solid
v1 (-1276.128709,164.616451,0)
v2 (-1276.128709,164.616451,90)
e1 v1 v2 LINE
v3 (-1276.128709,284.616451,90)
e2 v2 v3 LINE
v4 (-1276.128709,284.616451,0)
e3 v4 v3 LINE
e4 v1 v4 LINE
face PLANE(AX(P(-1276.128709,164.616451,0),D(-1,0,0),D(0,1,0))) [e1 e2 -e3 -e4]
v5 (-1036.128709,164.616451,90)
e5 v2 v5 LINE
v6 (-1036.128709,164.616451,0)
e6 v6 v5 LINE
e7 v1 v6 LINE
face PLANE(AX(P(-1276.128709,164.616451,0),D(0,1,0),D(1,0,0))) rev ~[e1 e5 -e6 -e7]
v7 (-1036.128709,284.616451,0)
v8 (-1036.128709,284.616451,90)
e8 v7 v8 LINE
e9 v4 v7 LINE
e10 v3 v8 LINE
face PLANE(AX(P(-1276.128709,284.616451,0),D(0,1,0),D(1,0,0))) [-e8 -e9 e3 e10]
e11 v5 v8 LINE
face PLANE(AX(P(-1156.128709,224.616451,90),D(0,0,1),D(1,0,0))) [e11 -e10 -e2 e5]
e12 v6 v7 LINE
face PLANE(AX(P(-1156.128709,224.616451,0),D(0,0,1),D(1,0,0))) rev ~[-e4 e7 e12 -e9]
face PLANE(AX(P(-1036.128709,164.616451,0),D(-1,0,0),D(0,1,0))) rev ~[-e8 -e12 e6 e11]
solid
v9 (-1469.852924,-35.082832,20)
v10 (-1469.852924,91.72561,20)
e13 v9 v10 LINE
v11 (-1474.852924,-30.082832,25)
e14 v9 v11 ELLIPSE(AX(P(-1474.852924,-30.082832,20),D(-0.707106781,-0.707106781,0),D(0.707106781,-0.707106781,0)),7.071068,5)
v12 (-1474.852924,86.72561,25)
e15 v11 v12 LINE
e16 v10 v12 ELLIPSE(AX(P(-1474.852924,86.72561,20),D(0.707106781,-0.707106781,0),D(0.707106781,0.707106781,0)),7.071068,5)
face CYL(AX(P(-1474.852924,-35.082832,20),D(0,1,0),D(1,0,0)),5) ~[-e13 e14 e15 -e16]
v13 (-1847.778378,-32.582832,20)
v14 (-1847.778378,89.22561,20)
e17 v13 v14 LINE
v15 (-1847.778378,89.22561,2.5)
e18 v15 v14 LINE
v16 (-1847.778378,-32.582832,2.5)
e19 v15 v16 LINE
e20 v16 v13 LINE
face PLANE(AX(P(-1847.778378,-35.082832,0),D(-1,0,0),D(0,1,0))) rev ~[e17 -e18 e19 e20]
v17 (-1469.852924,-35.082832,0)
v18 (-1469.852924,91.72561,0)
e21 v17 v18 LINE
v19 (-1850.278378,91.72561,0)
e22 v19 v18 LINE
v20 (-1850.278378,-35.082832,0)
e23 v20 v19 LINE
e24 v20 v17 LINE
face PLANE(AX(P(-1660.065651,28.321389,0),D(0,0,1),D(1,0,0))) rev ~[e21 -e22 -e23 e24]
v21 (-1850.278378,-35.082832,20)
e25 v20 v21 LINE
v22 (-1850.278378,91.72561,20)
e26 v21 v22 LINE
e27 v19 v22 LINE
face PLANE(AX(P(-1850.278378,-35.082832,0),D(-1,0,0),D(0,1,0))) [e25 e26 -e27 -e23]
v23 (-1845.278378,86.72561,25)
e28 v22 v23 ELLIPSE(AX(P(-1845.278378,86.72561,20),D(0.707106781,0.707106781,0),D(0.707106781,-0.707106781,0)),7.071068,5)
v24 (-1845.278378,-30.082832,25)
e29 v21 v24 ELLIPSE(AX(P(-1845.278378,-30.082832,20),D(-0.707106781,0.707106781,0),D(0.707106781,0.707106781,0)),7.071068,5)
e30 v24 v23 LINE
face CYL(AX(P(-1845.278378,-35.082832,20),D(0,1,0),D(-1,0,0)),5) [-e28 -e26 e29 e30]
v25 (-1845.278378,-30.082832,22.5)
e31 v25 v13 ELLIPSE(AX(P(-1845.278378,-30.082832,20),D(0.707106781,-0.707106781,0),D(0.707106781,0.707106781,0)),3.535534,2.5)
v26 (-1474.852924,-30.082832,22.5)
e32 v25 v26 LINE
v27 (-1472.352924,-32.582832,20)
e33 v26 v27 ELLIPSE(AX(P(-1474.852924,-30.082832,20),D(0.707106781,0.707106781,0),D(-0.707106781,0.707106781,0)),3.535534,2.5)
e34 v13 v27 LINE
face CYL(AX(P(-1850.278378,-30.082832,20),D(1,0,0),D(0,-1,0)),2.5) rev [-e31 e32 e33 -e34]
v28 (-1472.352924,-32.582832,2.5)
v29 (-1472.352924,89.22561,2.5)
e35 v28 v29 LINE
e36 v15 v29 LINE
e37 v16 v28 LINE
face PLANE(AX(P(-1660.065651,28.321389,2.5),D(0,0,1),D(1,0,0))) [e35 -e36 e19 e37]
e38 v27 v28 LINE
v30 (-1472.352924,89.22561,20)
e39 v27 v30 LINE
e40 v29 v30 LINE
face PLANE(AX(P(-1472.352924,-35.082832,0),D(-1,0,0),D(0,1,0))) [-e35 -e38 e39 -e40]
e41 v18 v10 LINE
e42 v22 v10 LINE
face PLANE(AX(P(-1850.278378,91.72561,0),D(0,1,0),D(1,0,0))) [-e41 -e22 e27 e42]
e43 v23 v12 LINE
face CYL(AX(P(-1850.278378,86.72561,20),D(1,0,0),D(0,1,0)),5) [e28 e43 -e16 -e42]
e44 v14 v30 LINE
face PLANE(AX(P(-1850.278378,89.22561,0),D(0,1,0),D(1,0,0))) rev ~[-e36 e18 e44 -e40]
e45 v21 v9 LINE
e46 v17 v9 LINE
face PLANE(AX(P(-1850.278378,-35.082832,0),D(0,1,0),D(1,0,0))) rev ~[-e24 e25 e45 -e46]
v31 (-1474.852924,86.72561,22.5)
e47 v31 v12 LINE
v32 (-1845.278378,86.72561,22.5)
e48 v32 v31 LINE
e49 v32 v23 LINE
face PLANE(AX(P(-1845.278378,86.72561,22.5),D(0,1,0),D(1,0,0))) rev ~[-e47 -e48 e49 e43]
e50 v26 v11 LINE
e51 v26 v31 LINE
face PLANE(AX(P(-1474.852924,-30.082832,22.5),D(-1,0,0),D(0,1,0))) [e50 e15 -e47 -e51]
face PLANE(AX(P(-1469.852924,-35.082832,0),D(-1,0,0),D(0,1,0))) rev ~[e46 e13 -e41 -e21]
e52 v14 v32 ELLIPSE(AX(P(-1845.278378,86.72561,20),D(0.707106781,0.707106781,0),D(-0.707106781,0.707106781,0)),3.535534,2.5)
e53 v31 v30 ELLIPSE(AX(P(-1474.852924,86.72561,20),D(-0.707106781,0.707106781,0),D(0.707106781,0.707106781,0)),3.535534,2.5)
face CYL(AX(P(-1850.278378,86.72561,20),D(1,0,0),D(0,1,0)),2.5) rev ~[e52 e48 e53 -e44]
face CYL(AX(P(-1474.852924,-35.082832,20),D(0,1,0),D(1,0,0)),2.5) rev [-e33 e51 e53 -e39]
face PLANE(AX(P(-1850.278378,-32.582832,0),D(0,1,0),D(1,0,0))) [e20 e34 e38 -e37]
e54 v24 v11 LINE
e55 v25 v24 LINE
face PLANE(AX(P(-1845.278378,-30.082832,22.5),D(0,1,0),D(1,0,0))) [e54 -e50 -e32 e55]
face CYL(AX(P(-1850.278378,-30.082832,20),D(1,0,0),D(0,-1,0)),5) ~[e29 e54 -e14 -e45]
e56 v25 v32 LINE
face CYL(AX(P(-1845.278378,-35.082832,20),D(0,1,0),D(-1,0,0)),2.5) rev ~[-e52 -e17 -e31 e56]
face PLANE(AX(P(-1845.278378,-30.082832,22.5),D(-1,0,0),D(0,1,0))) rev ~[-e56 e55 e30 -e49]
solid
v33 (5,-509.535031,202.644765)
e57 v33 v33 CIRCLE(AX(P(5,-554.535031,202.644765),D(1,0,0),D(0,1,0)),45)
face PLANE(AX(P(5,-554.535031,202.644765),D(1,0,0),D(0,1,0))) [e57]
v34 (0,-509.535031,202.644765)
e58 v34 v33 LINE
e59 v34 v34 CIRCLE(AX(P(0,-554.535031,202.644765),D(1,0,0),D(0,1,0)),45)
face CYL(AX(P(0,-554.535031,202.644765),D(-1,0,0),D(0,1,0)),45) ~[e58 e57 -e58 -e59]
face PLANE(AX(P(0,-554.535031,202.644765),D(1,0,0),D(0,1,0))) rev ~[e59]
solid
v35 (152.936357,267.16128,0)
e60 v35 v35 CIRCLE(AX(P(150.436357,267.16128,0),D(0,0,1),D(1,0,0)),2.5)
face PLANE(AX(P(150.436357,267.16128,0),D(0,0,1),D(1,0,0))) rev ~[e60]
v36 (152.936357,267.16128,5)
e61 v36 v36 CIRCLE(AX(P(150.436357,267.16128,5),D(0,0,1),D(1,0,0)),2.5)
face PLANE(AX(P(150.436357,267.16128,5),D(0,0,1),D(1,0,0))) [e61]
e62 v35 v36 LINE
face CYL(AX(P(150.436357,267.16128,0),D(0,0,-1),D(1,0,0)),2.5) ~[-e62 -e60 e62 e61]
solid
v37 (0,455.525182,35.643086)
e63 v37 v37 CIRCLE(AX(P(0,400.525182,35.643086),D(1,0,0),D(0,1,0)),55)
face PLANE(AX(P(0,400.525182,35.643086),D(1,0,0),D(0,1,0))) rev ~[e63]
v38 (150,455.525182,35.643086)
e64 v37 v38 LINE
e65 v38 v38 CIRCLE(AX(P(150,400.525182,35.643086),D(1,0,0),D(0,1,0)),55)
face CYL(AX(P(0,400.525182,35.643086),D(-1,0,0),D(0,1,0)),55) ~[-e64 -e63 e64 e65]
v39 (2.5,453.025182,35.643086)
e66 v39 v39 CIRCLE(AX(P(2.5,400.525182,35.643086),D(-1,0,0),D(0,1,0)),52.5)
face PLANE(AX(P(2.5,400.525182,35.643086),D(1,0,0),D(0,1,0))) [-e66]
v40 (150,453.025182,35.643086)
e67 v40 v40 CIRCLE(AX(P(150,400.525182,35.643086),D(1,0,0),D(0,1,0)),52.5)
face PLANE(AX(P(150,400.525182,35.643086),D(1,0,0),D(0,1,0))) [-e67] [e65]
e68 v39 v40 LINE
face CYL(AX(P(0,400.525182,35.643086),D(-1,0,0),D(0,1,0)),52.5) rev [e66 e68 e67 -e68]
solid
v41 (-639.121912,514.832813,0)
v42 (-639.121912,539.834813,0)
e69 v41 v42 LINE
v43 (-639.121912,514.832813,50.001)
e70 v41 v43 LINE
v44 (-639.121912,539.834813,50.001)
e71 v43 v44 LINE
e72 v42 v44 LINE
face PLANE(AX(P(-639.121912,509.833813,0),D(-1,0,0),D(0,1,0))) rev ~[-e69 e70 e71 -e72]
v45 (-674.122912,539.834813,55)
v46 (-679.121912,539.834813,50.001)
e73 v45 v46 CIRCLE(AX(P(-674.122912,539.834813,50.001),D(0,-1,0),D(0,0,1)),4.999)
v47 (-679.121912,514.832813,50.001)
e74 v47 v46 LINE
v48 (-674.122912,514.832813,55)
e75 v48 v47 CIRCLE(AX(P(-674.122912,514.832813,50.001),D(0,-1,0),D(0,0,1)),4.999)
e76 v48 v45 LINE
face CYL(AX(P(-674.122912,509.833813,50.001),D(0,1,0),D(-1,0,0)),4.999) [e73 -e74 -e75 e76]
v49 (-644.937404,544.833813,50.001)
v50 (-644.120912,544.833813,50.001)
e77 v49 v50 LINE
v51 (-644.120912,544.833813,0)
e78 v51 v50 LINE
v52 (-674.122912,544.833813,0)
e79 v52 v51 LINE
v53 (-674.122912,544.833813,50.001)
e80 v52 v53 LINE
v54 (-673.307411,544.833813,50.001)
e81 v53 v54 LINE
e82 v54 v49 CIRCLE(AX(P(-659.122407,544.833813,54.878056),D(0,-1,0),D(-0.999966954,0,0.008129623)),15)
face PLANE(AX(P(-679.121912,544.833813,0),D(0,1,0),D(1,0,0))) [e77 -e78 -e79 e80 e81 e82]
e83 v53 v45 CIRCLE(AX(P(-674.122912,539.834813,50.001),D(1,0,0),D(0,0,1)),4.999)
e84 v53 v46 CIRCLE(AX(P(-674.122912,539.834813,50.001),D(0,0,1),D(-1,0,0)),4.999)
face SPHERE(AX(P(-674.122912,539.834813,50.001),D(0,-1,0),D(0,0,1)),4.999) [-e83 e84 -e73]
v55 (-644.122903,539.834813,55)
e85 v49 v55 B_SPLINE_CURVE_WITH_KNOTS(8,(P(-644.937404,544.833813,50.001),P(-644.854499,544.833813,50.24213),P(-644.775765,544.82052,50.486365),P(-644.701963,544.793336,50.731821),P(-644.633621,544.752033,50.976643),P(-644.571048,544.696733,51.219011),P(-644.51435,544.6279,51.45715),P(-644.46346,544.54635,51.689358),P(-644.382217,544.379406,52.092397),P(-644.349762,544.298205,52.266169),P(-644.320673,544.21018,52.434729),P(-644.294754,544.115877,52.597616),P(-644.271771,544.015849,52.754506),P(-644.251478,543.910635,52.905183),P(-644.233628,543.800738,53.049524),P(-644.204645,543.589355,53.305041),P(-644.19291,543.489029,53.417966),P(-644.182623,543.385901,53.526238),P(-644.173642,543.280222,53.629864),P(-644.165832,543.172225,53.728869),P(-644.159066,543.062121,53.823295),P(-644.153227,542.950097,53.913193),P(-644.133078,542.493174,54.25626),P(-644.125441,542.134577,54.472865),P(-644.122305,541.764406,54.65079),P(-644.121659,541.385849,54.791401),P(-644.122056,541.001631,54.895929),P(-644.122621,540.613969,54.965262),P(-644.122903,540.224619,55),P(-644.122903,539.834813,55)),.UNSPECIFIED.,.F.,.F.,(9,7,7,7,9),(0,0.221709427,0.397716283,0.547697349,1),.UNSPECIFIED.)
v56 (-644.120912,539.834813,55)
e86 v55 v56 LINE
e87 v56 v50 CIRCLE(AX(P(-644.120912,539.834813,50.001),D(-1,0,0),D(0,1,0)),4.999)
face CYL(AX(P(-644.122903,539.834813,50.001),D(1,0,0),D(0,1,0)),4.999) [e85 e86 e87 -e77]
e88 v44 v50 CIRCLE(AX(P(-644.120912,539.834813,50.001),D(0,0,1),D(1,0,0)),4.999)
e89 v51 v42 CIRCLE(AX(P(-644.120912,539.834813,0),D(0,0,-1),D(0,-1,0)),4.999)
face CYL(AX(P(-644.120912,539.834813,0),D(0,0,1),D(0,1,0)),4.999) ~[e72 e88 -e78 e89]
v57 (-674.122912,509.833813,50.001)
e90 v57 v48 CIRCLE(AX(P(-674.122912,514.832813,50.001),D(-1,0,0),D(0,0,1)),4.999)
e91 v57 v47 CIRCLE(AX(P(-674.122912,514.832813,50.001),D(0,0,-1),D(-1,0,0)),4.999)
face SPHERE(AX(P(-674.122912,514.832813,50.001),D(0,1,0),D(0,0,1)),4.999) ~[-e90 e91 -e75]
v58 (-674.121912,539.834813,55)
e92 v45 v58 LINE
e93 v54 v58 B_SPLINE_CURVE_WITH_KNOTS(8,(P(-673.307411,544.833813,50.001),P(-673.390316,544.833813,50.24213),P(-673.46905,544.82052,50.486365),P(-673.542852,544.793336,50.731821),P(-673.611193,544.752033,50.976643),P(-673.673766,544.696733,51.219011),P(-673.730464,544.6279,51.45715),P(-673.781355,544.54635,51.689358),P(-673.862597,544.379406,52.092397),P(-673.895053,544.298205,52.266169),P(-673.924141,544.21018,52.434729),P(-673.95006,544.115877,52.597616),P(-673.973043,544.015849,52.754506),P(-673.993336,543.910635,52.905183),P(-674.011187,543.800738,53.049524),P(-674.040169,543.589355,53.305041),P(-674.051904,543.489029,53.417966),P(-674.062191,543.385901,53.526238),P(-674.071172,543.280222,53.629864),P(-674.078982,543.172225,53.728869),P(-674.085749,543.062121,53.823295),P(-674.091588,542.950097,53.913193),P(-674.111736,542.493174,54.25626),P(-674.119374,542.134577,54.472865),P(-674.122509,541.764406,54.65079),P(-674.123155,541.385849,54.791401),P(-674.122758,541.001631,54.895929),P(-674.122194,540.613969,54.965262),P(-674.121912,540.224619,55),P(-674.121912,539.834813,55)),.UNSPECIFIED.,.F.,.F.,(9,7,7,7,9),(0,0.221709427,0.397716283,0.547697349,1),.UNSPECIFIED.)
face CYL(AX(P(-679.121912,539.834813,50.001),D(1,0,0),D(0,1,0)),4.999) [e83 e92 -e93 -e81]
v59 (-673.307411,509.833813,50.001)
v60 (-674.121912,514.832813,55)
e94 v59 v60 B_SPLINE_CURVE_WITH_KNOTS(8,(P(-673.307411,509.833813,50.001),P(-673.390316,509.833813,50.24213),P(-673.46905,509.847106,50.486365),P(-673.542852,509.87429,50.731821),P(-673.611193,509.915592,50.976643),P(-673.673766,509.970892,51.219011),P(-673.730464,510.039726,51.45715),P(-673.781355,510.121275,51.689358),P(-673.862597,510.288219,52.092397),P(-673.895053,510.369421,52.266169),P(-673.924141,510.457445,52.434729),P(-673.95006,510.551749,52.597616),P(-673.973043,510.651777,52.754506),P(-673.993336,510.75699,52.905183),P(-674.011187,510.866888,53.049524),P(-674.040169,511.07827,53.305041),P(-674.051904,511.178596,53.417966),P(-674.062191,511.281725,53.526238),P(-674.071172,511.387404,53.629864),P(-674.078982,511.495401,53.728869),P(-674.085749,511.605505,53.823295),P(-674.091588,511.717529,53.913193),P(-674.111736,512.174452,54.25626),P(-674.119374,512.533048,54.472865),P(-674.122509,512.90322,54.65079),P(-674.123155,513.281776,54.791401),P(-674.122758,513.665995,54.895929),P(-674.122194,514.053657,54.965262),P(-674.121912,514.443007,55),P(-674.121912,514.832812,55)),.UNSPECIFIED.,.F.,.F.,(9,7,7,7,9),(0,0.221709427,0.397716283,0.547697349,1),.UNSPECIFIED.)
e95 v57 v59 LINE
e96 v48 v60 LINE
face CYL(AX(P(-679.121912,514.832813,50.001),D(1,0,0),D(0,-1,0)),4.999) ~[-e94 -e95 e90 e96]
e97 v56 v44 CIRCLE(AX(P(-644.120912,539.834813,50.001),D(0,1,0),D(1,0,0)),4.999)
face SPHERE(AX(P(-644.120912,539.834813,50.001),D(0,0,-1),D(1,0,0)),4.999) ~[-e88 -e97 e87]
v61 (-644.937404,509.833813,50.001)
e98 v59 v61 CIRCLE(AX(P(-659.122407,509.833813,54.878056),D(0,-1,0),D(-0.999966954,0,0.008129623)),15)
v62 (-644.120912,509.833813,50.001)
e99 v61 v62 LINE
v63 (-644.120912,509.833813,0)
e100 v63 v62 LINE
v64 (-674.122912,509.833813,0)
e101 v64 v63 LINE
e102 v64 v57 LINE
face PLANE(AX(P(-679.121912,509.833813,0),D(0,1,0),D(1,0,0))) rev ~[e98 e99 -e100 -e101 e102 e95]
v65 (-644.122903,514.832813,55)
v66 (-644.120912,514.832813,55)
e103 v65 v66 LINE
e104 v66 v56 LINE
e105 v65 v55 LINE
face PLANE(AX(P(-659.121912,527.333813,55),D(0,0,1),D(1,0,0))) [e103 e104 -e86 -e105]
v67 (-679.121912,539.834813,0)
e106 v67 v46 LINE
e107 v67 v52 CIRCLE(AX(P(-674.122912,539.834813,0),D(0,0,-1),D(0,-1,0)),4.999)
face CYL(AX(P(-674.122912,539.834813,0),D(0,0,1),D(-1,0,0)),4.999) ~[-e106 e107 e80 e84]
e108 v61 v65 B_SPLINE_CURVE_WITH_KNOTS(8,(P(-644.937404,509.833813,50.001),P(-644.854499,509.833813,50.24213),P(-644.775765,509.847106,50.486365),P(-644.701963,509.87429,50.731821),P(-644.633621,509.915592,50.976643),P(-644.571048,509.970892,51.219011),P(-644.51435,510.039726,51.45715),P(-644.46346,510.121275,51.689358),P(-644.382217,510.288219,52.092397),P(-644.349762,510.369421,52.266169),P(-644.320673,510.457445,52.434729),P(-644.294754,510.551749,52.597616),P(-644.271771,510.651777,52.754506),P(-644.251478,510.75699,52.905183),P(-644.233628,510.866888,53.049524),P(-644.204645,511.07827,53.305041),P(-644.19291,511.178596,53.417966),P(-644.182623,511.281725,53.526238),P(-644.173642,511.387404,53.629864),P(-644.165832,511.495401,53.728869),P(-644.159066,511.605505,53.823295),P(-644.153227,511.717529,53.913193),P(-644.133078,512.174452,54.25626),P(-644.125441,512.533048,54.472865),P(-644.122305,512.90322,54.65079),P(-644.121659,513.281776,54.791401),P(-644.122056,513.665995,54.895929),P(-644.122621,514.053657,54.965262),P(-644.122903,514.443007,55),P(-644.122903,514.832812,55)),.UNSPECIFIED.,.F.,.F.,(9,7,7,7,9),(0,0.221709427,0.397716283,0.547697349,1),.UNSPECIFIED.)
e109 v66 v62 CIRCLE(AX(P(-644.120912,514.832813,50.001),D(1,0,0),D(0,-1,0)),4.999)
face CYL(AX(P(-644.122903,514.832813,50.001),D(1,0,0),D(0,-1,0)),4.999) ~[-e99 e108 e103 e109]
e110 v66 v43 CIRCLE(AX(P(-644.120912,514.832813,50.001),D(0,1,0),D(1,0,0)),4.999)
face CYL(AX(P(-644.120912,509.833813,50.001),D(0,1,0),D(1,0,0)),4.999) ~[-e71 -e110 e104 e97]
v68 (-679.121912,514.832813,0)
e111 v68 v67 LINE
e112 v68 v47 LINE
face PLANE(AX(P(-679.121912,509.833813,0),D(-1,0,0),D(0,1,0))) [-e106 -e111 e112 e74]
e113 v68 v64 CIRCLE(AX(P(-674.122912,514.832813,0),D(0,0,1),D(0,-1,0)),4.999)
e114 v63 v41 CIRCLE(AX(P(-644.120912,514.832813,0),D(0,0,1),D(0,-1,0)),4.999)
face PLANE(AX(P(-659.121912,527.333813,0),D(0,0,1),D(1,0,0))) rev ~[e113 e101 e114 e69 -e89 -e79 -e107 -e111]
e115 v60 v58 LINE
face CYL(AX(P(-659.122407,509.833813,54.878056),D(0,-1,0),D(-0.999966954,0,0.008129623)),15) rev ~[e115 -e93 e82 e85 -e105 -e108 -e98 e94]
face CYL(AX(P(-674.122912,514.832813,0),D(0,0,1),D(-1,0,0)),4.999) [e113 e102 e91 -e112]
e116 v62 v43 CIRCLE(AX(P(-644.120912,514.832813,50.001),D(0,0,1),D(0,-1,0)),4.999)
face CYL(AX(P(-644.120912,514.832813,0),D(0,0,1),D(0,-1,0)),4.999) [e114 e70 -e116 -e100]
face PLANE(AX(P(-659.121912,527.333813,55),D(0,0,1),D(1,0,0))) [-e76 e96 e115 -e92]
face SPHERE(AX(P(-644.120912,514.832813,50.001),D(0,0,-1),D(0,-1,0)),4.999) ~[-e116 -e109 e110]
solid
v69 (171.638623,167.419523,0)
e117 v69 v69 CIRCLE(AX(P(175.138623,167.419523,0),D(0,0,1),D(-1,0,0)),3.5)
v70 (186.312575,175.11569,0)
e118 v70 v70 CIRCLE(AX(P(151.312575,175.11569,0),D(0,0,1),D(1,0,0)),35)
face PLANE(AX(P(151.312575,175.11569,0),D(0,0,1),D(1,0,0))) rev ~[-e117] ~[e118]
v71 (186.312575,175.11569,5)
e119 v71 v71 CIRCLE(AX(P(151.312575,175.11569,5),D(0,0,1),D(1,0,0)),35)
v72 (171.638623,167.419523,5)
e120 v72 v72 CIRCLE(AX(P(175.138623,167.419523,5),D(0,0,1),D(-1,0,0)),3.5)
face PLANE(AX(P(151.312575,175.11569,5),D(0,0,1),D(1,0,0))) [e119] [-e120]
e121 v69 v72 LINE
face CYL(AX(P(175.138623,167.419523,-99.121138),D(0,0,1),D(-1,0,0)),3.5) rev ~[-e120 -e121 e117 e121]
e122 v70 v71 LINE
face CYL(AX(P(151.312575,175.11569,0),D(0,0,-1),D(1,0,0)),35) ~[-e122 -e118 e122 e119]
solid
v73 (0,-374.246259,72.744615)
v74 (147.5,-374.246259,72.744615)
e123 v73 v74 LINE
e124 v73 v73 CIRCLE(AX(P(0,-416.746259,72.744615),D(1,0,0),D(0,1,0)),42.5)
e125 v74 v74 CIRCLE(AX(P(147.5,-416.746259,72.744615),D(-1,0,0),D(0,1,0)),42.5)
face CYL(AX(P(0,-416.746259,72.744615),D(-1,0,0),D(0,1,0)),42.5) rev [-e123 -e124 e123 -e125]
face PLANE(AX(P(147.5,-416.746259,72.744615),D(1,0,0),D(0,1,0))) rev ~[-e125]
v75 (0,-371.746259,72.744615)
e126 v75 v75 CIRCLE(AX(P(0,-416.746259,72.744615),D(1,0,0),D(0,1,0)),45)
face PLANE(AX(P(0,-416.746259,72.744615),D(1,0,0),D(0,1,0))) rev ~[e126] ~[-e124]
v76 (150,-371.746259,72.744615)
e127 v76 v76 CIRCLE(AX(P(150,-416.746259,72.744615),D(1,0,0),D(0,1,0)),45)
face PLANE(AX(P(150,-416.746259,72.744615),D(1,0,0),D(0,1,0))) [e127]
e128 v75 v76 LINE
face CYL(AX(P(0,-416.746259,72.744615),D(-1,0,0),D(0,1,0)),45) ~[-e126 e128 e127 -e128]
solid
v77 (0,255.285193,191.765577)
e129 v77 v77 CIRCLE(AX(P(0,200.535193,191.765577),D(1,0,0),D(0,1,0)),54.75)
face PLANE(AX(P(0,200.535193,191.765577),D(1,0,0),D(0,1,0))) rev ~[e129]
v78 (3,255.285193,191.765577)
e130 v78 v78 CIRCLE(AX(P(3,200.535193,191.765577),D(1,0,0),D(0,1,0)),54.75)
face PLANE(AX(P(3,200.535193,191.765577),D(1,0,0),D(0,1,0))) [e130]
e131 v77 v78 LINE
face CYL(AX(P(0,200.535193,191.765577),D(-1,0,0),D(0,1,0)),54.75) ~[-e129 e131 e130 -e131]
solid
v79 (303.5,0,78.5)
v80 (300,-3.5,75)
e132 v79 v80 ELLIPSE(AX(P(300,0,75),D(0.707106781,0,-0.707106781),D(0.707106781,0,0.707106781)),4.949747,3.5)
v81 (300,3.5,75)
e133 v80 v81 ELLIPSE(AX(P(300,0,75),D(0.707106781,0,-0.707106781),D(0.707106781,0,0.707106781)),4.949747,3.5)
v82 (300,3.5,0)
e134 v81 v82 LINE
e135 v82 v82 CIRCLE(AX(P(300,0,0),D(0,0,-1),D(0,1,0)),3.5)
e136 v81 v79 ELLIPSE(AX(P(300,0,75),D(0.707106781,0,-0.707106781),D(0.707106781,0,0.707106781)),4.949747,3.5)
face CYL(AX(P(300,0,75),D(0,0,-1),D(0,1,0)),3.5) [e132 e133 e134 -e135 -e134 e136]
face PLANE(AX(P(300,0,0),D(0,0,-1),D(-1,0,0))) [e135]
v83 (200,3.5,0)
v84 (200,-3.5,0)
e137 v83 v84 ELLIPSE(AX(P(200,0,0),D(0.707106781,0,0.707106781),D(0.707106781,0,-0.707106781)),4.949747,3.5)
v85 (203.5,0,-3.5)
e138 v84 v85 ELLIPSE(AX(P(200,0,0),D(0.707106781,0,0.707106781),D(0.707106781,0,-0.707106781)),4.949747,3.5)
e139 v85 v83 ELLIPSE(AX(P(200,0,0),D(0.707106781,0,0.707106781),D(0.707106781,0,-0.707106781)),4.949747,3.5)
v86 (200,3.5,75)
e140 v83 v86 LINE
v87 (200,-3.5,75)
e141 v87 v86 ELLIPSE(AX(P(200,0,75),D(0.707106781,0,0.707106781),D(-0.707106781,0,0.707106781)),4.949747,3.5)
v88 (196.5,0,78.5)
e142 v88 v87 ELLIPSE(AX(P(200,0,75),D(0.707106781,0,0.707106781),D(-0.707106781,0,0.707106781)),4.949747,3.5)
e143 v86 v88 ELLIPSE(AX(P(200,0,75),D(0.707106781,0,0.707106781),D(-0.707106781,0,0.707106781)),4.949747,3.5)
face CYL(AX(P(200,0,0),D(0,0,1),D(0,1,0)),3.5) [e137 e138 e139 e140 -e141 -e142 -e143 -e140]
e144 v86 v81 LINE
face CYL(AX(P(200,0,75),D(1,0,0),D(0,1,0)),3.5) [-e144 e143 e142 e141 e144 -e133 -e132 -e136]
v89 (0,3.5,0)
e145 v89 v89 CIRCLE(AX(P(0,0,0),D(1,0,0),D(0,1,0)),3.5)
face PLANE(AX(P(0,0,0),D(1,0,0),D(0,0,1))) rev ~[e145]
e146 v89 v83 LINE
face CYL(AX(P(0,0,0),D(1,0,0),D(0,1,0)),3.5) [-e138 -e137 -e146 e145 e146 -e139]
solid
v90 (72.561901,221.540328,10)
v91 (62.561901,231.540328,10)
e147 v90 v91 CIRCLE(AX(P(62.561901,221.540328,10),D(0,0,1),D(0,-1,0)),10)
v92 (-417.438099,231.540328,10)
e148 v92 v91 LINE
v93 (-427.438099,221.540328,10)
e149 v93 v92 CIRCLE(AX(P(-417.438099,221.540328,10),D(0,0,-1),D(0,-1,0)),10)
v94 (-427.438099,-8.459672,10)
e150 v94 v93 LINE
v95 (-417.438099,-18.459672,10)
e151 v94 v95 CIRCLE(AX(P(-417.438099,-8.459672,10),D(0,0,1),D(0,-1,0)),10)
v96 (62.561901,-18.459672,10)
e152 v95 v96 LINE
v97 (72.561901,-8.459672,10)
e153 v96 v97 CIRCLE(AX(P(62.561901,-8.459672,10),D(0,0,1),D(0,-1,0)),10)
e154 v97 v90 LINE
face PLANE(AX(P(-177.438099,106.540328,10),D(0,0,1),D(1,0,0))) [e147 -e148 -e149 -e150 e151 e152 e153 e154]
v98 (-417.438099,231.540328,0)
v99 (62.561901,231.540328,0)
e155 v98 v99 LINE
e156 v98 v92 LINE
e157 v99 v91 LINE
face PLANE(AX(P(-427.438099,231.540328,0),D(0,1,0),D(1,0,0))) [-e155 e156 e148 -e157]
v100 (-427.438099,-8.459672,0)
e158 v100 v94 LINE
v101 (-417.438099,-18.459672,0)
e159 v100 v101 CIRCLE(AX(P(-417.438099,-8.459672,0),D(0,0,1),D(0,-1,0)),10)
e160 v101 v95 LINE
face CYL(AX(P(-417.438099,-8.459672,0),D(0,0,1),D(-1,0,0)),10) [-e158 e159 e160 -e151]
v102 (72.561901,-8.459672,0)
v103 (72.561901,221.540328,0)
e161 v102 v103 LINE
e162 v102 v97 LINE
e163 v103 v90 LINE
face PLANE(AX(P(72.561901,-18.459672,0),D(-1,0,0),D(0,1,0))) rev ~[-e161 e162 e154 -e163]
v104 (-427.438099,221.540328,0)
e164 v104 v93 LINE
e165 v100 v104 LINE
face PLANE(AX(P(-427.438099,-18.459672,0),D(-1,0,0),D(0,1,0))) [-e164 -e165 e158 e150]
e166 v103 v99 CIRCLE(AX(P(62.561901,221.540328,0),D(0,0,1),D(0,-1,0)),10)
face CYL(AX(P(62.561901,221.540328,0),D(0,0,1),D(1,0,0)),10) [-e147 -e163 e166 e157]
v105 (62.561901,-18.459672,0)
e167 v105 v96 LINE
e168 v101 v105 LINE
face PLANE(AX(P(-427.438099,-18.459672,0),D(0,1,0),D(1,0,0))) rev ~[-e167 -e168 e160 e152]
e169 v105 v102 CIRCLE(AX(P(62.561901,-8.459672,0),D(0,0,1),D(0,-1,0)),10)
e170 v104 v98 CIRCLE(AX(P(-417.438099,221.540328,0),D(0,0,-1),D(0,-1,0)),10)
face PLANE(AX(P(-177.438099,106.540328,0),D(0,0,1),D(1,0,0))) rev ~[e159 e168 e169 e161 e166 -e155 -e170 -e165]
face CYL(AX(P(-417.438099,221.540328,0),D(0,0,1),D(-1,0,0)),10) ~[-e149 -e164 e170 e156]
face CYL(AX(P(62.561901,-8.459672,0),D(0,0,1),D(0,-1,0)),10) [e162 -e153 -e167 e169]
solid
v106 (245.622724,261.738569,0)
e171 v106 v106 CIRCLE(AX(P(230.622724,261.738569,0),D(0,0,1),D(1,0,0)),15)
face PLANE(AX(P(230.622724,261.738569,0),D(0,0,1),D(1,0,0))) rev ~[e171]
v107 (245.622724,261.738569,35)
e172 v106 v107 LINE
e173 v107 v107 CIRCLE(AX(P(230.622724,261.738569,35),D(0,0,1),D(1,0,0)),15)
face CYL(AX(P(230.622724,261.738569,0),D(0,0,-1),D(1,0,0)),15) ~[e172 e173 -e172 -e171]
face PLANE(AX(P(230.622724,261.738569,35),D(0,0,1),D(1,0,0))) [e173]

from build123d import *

# Parameters (mm, degrees)
F0_W      = 500
F0_H      = 250
F1_DEPTH  = 10
F2_R      = 55
F3_DEPTH  = 150
F4_T      = -2.5
F5_R      = 10
F6_R      = 54.75
F7_DEPTH  = 3
F9_R      = 3.5
F11_R     = 35
F12_DEPTH = 5
F13_R     = 15
F14_DEPTH = 35
F15_R     = 2.5
F16_DEPTH = 5
F17_W     = 40
F17_H     = 35
F18_DEPTH = 55
F20_DEPTH = 40
F21_R     = 4.999
F23_D     = 7
F24_W     = 240
F24_H     = 120
F25_DEPTH = 90
F26_R     = 45
F27_DEPTH = 150
F28_T     = -2.5
F29_R     = 45
F30_DEPTH = 5
F31_W     = 380.425453186
F31_H     = 126.8084421754
F32_DEPTH = 25
F33_R     = 5
F34_T     = -2.5


# Not quite as in the source:
# - a fillet or chamfer is up to 0.001 mm smaller than in the source, because OpenCascade refuses the exact size
# - a shell that OpenCascade refuses in one call is made with other operations: the cavity is built on its own and cut out


with BuildPart() as f1:
    # F0 (on Top) → F1 (new body)
    with BuildSketch(Plane.XY):
        with Locations((-177.4380993843, 106.5403278917)):
            Rectangle(F0_W, F0_H)
    extrude(amount=F1_DEPTH)

    # F5
    f5_edges = [f1.edges().sort_by_distance(p)[0] for p in [
        (72.561901, 231.540328, 5),
        (-427.438099, 231.540328, 5),
        (-427.438099, -18.459672, 5),
        (72.561901, -18.459672, 5),
    ]]
    fillet(f5_edges, radius=F5_R)


with BuildPart() as f3:
    # F2 (on Right) → F3 (new body)
    with BuildSketch(Plane.YZ):
        with Locations((400.5251824856, 35.6430858374)):
            Circle(F2_R)
    extrude(amount=F3_DEPTH)

    # F4
    f4_openings = [f3.faces().sort_by_distance(p)[0] for p in [
        (150, 400.525182, 35.643086),
    ]]
    offset(amount=F4_T, openings=f4_openings)


with BuildPart() as f7:
    # F6 (on Right) → F7 (new body)
    with BuildSketch(Plane.YZ):
        with Locations((200.5351930857, 191.765576601)):
            Circle(F6_R)
    extrude(amount=F7_DEPTH)


with BuildPart() as f10:
    # F10: sweep along a path in F8
    with BuildLine(Plane.XZ) as f10_path:
        Line((0, 0), (200, 0))
        Line((200, 0), (200, 75))
        Line((200, 75), (300, 75))
        Line((300, 75), (300, 0))
    # F9 (on Right) → F10 (sweep)
    with BuildSketch(Plane.YZ):
        Circle(F9_R)
    sweep(path=f10_path.line, transition=Transition.RIGHT)


with BuildPart() as f12:
    # F11 (on Top) → F12 (new body)
    with BuildSketch(Plane.XY):
        with Locations((151.3125747442, 175.1156896353)):
            Circle(F11_R)
    extrude(amount=F12_DEPTH)

    # F23 (through all)
    with Locations(Plane(origin=(0, 0, 0), x_dir=(1, 0, 0), z_dir=(0, 0, -1))):
        with Locations((175.1386225224, -167.4195230007)):
            Hole(F23_D / 2)


with BuildPart() as f14:
    # F13 (on Top) → F14 (new body)
    with BuildSketch(Plane.XY):
        with Locations((230.6227236986, 261.7385685444)):
            Circle(F13_R)
    extrude(amount=F14_DEPTH)


with BuildPart() as f16:
    # F15 (on Top) → F16 (new body)
    with BuildSketch(Plane.XY):
        with Locations((150.4363566637, 267.1612799168)):
            Circle(F15_R)
    extrude(amount=F16_DEPTH)


with BuildPart() as f18:
    # F17 (on Top) → F18 (new body)
    with BuildSketch(Plane.XY):
        with Locations((-659.1219115257, 527.3338127136)):
            Rectangle(F17_W, F17_H)
    extrude(amount=F18_DEPTH)

    # F19 (on face) → F20 (cut)
    with BuildSketch(Plane.XZ.offset(-509.8338127136)):
        with BuildLine():
            Line((-644.1229029035, 55), (-674.1219115257, 55))
            ThreePointArc((-674.1219115257, 55), (-659.1224072146, 39.8780556624), (-644.1229029035, 55))
        make_face()
    extrude(amount=-F20_DEPTH, mode=Mode.SUBTRACT)

    # F21 (radius 5 in the source; OpenCascade refuses exactly that, so slightly less here)
    f21_edges = [f18.edges().sort_by_distance(p)[0] for p in [
        (-679.121912, 527.333813, 55),
        (-676.621912, 509.833813, 55),
        (-679.121912, 509.833813, 27.5),
        (-639.121912, 509.833813, 27.5),
        (-641.622407, 509.833813, 55),
        (-639.121912, 544.833813, 27.5),
        (-639.121912, 527.333813, 55),
        (-641.622407, 544.833813, 55),
        (-676.621912, 544.833813, 55),
        (-679.121912, 544.833813, 27.5),
    ]]
    fillet(f21_edges, radius=F21_R)


with BuildPart() as f25:
    # F24 (on Top) → F25 (new body)
    with BuildSketch(Plane.XY):
        with Locations((-1156.1287093163, 224.6164506674)):
            Rectangle(F24_W, F24_H)
    extrude(amount=F25_DEPTH)


with BuildPart() as f27:
    # F26 (on Right) → F27 (new body)
    with BuildSketch(Plane.YZ):
        with Locations((-416.7462587357, 72.744615376)):
            Circle(F26_R)
    extrude(amount=F27_DEPTH)

    # F28
    f28_openings = [f27.faces().sort_by_distance(p)[0] for p in [
        (0, -416.746259, 72.744615),
    ]]
    offset(amount=F28_T, openings=f28_openings)


with BuildPart() as f30:
    # F29 (on Right) → F30 (new body)
    with BuildSketch(Plane.YZ):
        with Locations((-554.5350313187, 202.644765377)):
            Circle(F29_R)
    extrude(amount=F30_DEPTH)


with BuildPart() as f32:
    # F31 (on Top) → F32 (new body)
    with BuildSketch(Plane.XY):
        with Locations((-1660.0656509399, 28.3213891089)):
            Rectangle(F31_W, F31_H)
    extrude(amount=F32_DEPTH)

    # F33
    f33_edges = [f32.edges().sort_by_distance(p)[0] for p in [
        (-1660.065651, -35.082832, 25),
        (-1469.852924, 28.321389, 25),
        (-1660.065651, 91.72561, 25),
        (-1850.278378, 28.321389, 25),
    ]]
    fillet(f33_edges, radius=F33_R)

    # F34: a shell. OpenCascade refuses it in one call, so the cavity is built on its own and cut out:
    # the body offset inwards by the wall thickness, plus a prism from it out through each open face.
    f34_core = offset(f32.part, amount=F34_T, mode=Mode.PRIVATE)
    f34_exits = [f34_core.faces().sort_by_distance(p)[0] for p in [
        (-1660.065651, 28.321389, 22.5),
    ]]
    add(f34_core, mode=Mode.SUBTRACT)
    extrude(f34_exits, amount=-F34_T, mode=Mode.SUBTRACT)


solid = Compound([f1.part, f3.part, f7.part, f10.part, f12.part, f14.part, f16.part, f18.part, f25.part, f27.part, f30.part, f32.part])
